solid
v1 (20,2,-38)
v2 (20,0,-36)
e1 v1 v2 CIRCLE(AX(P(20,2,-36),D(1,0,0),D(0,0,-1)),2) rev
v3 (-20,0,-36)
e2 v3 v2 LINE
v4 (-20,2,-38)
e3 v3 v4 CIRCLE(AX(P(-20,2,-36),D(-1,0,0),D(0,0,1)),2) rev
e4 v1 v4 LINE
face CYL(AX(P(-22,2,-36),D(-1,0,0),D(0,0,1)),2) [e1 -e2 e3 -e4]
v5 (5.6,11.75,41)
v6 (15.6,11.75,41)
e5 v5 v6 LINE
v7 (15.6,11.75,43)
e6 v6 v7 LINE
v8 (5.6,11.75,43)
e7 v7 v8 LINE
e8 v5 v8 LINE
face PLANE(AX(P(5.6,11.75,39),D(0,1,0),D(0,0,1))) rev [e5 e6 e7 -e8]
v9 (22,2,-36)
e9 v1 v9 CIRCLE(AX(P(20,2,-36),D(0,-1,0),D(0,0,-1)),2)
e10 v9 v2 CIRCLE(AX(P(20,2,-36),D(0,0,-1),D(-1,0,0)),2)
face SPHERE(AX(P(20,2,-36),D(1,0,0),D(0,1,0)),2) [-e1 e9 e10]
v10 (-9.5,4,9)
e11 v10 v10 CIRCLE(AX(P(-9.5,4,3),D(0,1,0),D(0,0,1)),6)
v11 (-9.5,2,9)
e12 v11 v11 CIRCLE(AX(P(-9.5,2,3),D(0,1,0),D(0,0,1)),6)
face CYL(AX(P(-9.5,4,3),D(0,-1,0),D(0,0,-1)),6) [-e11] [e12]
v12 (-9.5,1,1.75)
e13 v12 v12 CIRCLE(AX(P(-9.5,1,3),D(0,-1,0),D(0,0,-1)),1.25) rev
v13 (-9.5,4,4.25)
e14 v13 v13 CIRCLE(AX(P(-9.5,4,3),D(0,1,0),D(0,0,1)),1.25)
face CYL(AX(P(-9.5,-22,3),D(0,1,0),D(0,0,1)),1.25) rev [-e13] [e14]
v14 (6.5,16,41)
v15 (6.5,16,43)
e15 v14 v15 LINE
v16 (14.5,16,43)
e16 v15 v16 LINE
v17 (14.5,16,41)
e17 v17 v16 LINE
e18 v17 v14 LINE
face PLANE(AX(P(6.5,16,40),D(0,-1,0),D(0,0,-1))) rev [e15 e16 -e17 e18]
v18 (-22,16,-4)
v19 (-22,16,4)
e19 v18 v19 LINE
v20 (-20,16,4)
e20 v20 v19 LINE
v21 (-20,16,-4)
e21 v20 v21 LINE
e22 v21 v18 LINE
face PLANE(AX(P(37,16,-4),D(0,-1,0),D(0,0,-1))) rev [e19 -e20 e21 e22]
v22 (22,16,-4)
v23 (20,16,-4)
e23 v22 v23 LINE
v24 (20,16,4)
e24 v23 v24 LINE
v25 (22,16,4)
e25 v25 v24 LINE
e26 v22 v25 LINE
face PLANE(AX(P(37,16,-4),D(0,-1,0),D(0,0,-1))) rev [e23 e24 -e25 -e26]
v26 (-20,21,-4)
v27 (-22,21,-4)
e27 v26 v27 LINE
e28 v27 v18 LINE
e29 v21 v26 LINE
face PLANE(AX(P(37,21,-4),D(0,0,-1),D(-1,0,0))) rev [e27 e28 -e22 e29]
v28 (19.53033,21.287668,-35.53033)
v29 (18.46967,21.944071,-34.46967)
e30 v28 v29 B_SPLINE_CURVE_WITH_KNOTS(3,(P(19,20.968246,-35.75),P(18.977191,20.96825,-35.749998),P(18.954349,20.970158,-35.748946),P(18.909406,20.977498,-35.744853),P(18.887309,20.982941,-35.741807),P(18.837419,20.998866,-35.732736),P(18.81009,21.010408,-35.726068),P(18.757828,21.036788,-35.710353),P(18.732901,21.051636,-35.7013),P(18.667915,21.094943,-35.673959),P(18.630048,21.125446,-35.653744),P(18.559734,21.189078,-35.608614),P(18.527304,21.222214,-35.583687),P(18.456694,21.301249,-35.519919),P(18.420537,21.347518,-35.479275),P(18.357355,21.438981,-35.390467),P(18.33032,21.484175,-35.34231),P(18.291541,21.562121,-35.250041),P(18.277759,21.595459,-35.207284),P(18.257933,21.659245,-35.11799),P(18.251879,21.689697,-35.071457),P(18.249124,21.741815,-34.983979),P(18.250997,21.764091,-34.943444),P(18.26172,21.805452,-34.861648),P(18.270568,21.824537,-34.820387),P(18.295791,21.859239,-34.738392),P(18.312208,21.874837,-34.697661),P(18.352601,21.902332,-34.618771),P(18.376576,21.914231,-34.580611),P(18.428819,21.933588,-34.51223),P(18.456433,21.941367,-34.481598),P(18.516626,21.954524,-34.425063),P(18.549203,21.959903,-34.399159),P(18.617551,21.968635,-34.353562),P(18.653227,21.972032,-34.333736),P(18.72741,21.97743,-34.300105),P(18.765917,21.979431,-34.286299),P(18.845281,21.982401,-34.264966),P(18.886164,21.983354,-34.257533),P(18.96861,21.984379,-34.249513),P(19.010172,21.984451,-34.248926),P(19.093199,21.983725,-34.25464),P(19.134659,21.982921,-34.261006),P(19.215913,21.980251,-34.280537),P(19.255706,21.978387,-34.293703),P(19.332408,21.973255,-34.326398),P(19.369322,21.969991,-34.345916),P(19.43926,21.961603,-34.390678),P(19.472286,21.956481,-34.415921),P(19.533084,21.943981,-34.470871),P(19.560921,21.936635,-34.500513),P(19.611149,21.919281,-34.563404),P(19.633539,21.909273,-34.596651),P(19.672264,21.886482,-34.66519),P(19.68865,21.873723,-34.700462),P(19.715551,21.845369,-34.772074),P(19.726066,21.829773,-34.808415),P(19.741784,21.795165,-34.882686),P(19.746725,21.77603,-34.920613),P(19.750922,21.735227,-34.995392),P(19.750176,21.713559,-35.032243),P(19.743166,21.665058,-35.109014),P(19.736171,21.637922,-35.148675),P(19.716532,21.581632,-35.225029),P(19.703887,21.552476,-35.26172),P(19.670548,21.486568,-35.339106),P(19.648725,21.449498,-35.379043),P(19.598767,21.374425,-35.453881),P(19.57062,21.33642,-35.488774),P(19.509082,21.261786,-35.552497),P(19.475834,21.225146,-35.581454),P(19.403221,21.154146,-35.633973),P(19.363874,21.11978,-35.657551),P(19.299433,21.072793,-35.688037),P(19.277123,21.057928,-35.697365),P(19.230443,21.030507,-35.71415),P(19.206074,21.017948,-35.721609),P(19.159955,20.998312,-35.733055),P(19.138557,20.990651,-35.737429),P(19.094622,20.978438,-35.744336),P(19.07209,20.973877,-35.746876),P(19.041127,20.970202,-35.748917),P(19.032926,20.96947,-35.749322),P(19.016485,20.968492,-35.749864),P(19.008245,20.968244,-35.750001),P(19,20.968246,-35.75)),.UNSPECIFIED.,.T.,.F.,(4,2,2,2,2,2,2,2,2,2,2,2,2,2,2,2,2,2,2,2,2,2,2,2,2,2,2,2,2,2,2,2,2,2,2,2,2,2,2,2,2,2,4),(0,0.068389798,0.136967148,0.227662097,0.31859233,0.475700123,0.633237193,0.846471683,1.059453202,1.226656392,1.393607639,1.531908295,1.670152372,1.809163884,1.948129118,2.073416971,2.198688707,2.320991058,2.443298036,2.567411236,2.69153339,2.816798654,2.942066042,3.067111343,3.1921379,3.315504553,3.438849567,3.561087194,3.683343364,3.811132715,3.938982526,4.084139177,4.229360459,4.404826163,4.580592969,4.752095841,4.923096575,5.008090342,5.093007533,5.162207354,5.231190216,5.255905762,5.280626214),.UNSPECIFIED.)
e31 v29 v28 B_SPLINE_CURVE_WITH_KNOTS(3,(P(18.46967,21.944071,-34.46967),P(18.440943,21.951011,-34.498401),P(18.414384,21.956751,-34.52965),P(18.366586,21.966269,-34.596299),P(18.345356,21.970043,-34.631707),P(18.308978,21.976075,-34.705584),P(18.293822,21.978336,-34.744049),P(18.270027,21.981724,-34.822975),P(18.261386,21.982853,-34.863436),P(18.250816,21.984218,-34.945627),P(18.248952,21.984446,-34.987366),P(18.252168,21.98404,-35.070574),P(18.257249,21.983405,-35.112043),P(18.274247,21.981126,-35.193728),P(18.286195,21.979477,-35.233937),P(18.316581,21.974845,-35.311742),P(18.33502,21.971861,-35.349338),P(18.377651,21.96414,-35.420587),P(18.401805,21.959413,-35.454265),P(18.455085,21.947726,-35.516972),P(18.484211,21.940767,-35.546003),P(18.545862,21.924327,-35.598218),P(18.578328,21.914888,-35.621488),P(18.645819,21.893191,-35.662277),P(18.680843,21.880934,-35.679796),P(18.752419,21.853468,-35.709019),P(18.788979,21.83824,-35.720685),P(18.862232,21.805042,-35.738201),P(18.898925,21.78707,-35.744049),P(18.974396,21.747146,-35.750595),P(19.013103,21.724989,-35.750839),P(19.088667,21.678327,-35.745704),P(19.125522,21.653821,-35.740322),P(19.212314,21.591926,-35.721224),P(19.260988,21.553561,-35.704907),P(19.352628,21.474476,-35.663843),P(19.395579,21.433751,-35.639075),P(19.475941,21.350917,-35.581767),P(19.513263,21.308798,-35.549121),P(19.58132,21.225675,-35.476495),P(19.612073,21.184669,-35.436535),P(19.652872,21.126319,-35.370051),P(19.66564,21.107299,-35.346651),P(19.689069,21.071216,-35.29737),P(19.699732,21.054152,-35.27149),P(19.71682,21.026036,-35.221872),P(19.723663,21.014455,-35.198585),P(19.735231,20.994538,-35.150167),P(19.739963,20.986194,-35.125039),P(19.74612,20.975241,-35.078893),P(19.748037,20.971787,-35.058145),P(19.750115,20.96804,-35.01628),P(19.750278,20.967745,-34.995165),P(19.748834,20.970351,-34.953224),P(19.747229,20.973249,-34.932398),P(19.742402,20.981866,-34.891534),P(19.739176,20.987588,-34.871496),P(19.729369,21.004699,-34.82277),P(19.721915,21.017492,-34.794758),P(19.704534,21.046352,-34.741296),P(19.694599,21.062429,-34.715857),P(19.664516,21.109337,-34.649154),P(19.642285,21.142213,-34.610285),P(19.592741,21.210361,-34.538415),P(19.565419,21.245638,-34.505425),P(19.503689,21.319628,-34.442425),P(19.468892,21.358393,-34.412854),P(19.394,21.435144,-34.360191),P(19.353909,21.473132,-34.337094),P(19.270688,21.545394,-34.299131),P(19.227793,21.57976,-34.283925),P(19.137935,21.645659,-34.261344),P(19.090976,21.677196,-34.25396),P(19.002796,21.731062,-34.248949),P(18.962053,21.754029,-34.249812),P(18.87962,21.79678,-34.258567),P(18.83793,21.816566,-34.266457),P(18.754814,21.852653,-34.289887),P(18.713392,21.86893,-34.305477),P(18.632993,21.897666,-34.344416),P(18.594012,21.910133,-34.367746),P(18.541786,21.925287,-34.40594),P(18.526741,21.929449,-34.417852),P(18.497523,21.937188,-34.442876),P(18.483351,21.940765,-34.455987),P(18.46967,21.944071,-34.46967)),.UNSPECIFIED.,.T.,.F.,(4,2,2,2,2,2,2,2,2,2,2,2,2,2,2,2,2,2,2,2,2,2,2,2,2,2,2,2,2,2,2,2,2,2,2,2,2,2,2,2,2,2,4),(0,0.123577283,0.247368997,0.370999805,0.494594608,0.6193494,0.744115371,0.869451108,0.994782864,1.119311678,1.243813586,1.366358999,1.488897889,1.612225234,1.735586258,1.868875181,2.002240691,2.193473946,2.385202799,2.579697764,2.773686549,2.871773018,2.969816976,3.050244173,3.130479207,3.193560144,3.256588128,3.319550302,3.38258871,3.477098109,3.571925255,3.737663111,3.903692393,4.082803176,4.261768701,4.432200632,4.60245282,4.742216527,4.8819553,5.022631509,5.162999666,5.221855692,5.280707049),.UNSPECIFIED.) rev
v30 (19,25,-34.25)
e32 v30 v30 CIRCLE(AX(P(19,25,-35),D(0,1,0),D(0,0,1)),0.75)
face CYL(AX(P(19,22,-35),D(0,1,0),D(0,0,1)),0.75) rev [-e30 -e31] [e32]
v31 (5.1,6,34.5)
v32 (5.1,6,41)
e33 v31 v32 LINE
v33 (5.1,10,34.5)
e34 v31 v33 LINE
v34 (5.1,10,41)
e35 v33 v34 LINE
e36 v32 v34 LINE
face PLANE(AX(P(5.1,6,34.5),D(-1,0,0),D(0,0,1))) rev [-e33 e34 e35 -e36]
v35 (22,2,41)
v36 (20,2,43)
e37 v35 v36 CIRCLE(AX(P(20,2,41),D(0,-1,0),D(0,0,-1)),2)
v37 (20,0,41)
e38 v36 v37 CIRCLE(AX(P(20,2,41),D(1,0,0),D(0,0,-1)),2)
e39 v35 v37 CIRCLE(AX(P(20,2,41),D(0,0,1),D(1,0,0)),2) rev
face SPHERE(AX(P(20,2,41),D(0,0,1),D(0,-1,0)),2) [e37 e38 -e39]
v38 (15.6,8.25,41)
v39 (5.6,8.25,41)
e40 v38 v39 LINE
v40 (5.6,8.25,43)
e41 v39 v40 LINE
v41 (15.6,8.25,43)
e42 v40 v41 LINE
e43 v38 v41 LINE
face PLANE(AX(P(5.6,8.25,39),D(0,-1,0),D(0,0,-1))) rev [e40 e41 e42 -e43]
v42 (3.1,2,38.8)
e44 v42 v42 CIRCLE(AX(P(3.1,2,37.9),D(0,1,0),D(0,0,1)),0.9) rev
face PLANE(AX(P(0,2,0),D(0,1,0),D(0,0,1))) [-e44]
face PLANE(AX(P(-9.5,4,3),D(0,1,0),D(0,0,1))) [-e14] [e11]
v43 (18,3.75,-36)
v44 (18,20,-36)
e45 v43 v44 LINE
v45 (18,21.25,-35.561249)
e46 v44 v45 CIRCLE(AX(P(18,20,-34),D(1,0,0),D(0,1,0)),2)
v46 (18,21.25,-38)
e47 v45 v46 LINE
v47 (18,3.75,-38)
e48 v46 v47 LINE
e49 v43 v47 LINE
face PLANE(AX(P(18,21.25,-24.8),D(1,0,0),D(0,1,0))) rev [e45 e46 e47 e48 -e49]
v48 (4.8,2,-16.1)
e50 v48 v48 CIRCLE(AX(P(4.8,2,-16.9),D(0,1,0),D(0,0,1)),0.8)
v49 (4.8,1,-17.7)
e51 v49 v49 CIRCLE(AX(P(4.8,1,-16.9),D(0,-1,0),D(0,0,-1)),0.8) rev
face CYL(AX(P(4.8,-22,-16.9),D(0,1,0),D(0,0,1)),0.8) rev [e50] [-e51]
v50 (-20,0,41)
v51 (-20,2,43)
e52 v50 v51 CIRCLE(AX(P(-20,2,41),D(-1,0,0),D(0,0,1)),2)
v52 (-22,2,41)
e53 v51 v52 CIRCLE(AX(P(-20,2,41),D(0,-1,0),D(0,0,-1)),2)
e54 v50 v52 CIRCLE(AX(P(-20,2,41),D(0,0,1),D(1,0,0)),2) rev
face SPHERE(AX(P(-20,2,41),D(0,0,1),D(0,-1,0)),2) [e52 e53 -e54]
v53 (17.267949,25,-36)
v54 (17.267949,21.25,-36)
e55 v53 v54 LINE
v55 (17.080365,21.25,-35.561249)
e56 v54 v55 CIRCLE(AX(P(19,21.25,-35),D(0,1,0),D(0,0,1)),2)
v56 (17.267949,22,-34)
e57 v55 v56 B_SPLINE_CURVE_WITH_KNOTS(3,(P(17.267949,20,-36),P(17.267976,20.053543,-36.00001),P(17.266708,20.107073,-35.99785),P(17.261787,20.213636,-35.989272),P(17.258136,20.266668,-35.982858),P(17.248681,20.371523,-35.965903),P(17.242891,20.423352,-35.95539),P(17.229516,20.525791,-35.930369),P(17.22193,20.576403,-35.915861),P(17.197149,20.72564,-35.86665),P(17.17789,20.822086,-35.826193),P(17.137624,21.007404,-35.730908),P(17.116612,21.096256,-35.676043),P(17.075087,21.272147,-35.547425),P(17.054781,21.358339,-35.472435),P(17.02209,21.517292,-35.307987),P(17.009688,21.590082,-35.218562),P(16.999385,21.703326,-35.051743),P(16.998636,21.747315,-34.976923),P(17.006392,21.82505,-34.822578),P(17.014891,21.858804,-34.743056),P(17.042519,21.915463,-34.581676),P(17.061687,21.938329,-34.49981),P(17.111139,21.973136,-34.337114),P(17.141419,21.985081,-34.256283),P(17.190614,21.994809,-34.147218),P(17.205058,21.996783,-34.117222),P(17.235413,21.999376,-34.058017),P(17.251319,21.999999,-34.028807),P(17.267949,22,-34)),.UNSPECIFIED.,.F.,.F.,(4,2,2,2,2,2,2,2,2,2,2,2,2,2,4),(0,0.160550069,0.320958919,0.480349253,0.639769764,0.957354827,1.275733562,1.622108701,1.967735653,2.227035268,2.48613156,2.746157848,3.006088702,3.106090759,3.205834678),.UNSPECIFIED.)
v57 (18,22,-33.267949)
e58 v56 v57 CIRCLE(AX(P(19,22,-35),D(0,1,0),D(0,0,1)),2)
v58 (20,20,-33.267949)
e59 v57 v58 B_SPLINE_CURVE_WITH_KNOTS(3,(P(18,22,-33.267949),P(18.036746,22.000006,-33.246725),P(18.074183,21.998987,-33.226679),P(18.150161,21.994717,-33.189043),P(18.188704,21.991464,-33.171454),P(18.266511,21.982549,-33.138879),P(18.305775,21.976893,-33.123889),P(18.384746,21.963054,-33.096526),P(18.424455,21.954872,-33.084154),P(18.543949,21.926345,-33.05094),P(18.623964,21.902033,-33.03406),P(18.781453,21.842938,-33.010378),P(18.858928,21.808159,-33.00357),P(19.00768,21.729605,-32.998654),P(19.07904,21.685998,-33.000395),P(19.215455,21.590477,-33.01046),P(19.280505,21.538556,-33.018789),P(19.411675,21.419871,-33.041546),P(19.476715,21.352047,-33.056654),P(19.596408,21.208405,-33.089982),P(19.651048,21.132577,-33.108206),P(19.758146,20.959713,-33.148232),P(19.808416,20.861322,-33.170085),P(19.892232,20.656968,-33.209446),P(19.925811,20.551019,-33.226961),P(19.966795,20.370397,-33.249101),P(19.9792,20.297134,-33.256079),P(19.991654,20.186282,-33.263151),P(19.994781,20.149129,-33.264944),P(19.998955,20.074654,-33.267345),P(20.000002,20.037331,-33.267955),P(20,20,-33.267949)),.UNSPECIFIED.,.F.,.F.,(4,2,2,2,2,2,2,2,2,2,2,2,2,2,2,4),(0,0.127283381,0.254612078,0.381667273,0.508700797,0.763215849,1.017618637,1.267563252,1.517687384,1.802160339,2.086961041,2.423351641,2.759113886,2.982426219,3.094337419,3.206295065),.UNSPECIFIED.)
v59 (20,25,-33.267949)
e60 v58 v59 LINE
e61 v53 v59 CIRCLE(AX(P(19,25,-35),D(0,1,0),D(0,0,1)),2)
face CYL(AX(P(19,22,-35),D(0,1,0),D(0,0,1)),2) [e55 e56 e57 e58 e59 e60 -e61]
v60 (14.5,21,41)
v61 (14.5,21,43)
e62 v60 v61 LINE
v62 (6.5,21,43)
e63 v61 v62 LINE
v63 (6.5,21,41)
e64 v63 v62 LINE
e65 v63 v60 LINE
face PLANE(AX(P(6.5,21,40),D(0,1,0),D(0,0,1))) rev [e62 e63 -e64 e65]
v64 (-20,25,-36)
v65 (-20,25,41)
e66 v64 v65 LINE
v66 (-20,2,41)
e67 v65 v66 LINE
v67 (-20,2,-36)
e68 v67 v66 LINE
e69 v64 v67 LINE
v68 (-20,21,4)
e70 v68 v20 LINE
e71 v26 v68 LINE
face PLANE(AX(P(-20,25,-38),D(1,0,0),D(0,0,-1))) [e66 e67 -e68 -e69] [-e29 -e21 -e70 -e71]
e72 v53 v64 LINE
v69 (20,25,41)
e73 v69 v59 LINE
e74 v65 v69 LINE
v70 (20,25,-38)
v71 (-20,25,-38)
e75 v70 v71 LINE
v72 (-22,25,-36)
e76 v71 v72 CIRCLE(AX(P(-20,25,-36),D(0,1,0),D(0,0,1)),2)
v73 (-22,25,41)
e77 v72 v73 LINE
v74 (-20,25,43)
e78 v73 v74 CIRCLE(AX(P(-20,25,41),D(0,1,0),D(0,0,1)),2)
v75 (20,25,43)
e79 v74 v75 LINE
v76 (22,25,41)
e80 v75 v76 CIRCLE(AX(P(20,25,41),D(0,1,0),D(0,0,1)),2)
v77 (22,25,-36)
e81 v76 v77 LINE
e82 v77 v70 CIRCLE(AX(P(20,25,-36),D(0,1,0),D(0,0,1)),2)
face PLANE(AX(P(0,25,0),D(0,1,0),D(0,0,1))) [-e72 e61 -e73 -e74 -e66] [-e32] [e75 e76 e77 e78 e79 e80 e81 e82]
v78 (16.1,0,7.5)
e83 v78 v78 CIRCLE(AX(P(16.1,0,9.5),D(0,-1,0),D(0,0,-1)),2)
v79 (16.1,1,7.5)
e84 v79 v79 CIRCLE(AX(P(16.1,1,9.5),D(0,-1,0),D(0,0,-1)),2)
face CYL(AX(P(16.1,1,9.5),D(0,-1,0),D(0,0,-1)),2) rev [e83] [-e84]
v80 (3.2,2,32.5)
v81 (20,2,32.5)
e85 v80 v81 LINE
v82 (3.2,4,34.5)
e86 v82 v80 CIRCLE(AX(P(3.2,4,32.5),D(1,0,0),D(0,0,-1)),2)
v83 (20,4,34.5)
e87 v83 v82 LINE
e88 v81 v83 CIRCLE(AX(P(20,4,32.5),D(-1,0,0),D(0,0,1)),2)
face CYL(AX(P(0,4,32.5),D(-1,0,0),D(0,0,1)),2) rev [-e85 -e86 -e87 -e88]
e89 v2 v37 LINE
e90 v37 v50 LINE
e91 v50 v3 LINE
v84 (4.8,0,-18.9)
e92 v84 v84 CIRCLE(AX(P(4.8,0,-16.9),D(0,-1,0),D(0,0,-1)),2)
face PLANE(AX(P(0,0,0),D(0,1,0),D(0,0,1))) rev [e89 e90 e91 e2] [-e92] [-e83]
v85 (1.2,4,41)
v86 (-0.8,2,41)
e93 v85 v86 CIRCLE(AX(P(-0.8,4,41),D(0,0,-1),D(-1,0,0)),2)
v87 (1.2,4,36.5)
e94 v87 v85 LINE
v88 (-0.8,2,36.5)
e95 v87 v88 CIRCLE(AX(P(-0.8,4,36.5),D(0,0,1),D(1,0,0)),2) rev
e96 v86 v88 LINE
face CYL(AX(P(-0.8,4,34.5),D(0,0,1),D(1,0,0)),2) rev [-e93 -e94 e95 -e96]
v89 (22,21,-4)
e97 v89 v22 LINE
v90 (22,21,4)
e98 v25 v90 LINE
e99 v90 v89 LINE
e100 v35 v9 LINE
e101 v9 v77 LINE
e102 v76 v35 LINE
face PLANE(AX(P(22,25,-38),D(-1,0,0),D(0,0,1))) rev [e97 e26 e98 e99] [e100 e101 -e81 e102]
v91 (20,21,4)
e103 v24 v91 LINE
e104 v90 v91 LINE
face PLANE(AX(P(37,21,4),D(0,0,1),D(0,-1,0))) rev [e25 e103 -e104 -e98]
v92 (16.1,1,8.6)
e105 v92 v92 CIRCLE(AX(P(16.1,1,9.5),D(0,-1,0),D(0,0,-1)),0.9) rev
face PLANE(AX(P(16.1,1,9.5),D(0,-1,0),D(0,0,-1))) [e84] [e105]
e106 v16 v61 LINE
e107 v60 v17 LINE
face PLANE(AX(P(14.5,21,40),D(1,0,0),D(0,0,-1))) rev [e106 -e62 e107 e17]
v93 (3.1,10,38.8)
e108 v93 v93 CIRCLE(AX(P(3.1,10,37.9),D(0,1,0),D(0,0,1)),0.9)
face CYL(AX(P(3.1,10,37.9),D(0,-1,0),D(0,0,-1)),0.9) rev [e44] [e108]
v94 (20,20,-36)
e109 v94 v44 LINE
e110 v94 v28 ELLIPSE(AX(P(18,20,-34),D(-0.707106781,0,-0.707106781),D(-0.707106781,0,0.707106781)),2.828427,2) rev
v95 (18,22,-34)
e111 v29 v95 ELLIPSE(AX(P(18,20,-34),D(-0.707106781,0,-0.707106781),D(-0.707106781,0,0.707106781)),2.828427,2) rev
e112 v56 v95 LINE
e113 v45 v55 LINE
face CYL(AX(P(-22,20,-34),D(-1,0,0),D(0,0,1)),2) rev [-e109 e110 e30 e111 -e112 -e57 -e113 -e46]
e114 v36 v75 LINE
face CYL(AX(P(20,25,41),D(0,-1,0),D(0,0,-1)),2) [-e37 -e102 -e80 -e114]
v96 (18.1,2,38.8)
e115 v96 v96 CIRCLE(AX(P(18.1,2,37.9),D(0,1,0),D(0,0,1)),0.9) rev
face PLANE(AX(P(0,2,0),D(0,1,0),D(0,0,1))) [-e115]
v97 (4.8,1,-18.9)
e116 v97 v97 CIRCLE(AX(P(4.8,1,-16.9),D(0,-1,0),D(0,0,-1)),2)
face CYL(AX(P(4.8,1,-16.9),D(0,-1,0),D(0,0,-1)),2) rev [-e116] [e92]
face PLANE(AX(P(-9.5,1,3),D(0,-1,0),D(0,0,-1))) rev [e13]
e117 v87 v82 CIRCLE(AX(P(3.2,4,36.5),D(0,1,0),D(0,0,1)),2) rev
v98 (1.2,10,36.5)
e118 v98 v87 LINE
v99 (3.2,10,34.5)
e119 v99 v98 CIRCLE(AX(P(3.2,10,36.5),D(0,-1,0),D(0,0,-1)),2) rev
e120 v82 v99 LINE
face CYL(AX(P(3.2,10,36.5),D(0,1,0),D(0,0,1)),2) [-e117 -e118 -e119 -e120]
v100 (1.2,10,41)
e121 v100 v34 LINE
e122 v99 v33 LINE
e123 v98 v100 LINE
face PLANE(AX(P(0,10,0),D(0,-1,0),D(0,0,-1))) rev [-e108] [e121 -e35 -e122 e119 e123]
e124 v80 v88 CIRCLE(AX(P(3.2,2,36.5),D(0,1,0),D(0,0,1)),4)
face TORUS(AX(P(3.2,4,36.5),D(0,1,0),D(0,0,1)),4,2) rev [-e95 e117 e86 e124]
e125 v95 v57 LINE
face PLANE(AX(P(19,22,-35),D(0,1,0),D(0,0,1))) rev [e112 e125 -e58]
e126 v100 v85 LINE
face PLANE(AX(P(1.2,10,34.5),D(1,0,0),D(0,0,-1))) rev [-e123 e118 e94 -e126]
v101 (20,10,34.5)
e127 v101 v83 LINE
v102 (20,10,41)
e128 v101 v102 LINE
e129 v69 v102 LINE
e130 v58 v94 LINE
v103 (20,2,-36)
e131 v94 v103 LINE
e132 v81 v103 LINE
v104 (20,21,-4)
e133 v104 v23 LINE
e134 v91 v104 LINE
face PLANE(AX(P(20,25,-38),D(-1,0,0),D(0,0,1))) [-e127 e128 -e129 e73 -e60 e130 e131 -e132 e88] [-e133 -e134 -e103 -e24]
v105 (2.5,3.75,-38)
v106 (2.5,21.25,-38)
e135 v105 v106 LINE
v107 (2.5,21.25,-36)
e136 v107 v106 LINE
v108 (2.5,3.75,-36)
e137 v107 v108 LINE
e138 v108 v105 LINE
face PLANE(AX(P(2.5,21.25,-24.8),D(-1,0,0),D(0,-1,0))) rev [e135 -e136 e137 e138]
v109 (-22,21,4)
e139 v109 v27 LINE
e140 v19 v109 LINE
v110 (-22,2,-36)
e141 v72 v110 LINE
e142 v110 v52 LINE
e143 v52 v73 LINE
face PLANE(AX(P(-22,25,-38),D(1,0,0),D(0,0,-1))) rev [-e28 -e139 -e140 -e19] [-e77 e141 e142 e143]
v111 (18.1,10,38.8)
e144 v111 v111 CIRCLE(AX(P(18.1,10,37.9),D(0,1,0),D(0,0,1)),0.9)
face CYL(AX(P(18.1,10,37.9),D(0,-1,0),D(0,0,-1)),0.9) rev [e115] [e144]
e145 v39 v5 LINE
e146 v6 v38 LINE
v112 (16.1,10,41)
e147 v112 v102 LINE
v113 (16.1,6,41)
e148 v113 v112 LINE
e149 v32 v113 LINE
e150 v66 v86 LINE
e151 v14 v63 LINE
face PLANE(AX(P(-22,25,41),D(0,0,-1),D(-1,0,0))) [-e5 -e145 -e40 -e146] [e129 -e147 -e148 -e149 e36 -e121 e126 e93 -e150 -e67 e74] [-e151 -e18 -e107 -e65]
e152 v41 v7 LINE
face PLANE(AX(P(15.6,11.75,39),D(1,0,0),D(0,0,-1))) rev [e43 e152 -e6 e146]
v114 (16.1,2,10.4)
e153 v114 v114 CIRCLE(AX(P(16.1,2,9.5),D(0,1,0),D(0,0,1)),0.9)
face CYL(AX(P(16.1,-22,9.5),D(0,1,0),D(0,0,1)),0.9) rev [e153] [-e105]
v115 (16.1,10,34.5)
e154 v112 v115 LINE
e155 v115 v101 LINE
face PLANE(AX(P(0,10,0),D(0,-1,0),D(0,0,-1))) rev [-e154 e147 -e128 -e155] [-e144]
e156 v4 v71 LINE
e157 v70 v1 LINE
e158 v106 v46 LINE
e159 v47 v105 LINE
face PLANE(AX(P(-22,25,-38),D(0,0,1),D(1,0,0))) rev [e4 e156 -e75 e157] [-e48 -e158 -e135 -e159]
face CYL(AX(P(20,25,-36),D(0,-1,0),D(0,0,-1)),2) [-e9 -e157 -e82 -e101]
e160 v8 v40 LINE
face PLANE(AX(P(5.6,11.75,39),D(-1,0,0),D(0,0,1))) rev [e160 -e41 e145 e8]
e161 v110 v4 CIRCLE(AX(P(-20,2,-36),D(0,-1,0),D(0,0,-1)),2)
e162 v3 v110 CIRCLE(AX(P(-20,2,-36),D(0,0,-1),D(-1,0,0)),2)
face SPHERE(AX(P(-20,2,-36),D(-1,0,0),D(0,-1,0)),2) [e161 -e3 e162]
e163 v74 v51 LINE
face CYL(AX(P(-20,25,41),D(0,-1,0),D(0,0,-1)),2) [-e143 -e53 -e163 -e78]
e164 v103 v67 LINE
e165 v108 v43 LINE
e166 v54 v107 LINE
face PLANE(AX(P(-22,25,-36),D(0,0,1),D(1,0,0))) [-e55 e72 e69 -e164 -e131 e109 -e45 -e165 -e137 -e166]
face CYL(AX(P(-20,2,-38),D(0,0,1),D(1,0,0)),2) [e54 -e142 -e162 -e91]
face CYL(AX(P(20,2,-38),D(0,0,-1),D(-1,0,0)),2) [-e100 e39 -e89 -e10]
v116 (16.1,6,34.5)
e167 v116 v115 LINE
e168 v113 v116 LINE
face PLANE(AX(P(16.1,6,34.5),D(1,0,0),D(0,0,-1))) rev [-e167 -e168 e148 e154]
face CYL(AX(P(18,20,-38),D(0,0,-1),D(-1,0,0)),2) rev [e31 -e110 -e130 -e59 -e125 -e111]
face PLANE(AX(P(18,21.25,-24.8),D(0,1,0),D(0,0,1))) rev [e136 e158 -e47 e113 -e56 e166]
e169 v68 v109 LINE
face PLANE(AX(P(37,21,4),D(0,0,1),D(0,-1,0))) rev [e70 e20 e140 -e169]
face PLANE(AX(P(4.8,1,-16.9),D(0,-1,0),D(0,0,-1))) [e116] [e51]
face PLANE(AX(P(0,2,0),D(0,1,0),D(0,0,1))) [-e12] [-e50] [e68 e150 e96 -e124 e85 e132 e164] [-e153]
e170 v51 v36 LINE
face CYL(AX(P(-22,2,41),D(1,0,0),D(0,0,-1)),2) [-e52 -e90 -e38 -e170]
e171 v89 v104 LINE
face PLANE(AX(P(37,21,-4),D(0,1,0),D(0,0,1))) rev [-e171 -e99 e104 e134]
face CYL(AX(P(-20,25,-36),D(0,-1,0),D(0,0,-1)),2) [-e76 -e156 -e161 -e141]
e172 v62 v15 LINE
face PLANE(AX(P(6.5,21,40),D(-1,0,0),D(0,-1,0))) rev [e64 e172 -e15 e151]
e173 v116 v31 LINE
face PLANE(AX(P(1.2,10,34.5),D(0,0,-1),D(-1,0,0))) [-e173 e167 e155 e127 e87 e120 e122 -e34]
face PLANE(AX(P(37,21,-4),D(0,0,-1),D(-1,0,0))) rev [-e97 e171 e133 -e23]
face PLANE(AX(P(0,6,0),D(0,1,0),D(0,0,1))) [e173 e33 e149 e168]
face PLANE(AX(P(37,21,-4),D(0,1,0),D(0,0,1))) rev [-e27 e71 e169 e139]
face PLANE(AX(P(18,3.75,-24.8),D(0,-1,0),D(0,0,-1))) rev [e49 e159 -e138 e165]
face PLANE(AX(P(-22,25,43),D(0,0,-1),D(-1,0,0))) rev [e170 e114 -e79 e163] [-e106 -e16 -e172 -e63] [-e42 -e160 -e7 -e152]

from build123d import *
from build123d.topology import SkipClean

# Parameters (mm, degrees)
SKETCH_1_W           = 44
SKETCH_1_H           = 81
EXTRUDE_1_DEPTH      = 25
SHELL_1_T            = -2
FILLET_1_R           = 2
SKETCH_2_R           = 0.8
SKETCH_2_R_2         = 0.9
CUT_EXTRUDE_1_DEPTH  = 24
SKETCH_3_R           = 1.25
CUT_EXTRUDE_2_DEPTH  = 24
SKETCH_4_R           = 6
EXTRUDE_2_DEPTH      = 2
CUT_EXTRUDE_START    = -13.2
SKETCH_6_R           = 1.25
CUT_EXTRUDE_4_DEPTH  = 13.2
SKETCH_7_W           = 15.5
SKETCH_7_H           = 17.5
CUT_EXTRUDE_5_DEPTH  = 13.2
SKETCH_9_W           = 18.8
SKETCH_9_H           = 6.5
SKETCH_9_R           = 0.9
EXTRUDE_3_DEPTH      = 8
SKETCH_11_W          = 11
SKETCH_11_H          = 6.5
CUT_EXTRUDE_6_DEPTH  = 4
SKETCH_12_W          = 10
SKETCH_12_H          = 3.5
CUT_EXTRUDE_7_DEPTH  = 4
FILLET_2_R           = 2
EXTRUDE_START        = -1
SKETCH_14_R          = 1.25
EXTRUDE_4_DEPTH      = 1
SKETCH_15_R          = 2
CUT_EXTRUDE_8_DEPTH  = 1
SKETCH_16_W          = 8
SKETCH_16_H          = 5
CUT_EXTRUDE_9_DEPTH  = 59
SKETCH_17_R          = 2
EXTRUDE_5_DEPTH      = 3
SKETCH_18_R          = 0.75
CUT_EXTRUDE_10_DEPTH = 3
FILLET_3_R           = 2
SKETCH_19_W          = 8
SKETCH_19_H          = 5
CUT_EXTRUDE_11_DEPTH = 3


with BuildPart() as part:
    # 草图1 → 凸台-拉伸1 (new body)
    with BuildSketch(Plane(origin=(0, 0, 0), x_dir=(1, 0, 0), z_dir=(0, 1, 0))):
        with Locations((0, -2.5)):
            Rectangle(SKETCH_1_W, SKETCH_1_H)
    extrude(amount=EXTRUDE_1_DEPTH)

    # 抽壳1
    shell_1_openings = [part.faces().sort_by_distance(p)[0] for p in [
        (0, 25, 2.5),
    ]]
    offset(amount=SHELL_1_T, openings=shell_1_openings, kind=Kind.INTERSECTION)

    # 圆角1
    fillet_1_edges = [part.edges().sort_by_distance(p)[0] for p in [
        (0, 0, -38),
        (22, 0, 2.5),
        (0, 0, 43),
        (-22, 0, 2.5),
        (-22, 12.5, -38),
        (22, 12.5, -38),
        (22, 12.5, 43),
        (-22, 12.5, 43),
    ]]
    fillet(fillet_1_edges, radius=FILLET_1_R)

    # 草图2 → 切除-拉伸1 (cut)
    with BuildSketch(Plane(origin=(0, 2, 0), x_dir=(1, 0, 0), z_dir=(0, 1, 0))):
        with Locations(Location((4.8, 16.9, 0), (0, 0, 270))):
            Circle(SKETCH_2_R)
        with Locations(Location((16.1, -9.5, 0), (0, 0, 270))):
            Circle(SKETCH_2_R_2)
    extrude(amount=-CUT_EXTRUDE_1_DEPTH, mode=Mode.SUBTRACT)

    # 草图3 → 切除-拉伸2 (cut)
    with BuildSketch(Plane(origin=(0, 2, 0), x_dir=(1, 0, 0), z_dir=(0, 1, 0))):
        with Locations(Location((-9.5, -3, 0), (0, 0, 270))):
            Circle(SKETCH_3_R)
    extrude(amount=-CUT_EXTRUDE_2_DEPTH, mode=Mode.SUBTRACT)

    # 草图4 → 凸台-拉伸2 (add)
    with BuildSketch(Plane(origin=(0, 2, 0), x_dir=(1, 0, 0), z_dir=(0, 1, 0))):
        with Locations(Location((-9.5, -3, 0), (0, 0, 270))):
            Circle(SKETCH_4_R)
    extrude(amount=EXTRUDE_2_DEPTH)

    # 草图6 → 切除-拉伸4 (cut)
    with BuildSketch(Plane.XZ.offset(CUT_EXTRUDE_START)):
        with Locations(Location((-9.5, 3, 0), (0, 0, 90))):
            Circle(SKETCH_6_R)
    extrude(amount=CUT_EXTRUDE_4_DEPTH, mode=Mode.SUBTRACT)

    # 草图7 → 切除-拉伸5 (cut)
    with BuildSketch(Plane(origin=(0, 0, -38), x_dir=(-1, 0, 0), z_dir=(0, 0, -1))):
        with Locations((-10.25, 12.5)):
            Rectangle(SKETCH_7_W, SKETCH_7_H)
    extrude(amount=-CUT_EXTRUDE_5_DEPTH, mode=Mode.SUBTRACT)

    # 草图9 → 凸台-拉伸3 (add)
    with BuildSketch(Plane(origin=(0, 2, 0), x_dir=(1, 0, 0), z_dir=(0, 1, 0))):
        with Locations((10.6, -37.75)):
            Rectangle(SKETCH_9_W, SKETCH_9_H)
        with Locations(Location((18.1, -37.9, 0), (0, 0, 270))):
            Circle(SKETCH_9_R, mode=Mode.SUBTRACT)
        with Locations(Location((3.1, -37.9, 0), (0, 0, 270))):
            Circle(SKETCH_9_R, mode=Mode.SUBTRACT)
    extrude(amount=EXTRUDE_3_DEPTH)

    # 草图11 → 切除-拉伸6 (cut)
    with BuildSketch(Plane(origin=(0, 10, 0), x_dir=(1, 0, 0), z_dir=(0, 1, 0))):
        with Locations((10.6, -37.75)):
            Rectangle(SKETCH_11_W, SKETCH_11_H)
    extrude(amount=-CUT_EXTRUDE_6_DEPTH, mode=Mode.SUBTRACT)

    # 草图12 → 切除-拉伸7 (cut)
    with BuildSketch(Plane.XY.offset(43)):
        with Locations((10.6, 10)):
            Rectangle(SKETCH_12_W, SKETCH_12_H)
    extrude(amount=-CUT_EXTRUDE_7_DEPTH, mode=Mode.SUBTRACT)

    # 圆角2
    fillet_2_edges = [part.edges().sort_by_distance(p)[0] for p in [
        (10.6, 2, 34.5),
        (1.2, 2, 37.75),
        (1.2, 6, 34.5),
    ]]
    fillet(fillet_2_edges, radius=FILLET_2_R)

    # 草图14 → 凸台-拉伸4 (add)
    with BuildSketch(Plane.XZ.offset(EXTRUDE_START)):
        with Locations(Location((-9.5, 3, 0), (0, 0, 90))):
            Circle(SKETCH_14_R)
    extrude(amount=EXTRUDE_4_DEPTH)

    # 草图15 → 切除-拉伸8 (cut)
    with BuildSketch(Plane.XZ):
        with Locations(Location((16.1, 9.5, 0), (0, 0, 270))):
            Circle(SKETCH_15_R)
        with Locations(Location((4.8, -16.9, 0), (0, 0, 270))):
            Circle(SKETCH_15_R)
    extrude(amount=-CUT_EXTRUDE_8_DEPTH, mode=Mode.SUBTRACT)

    # 草图16 → 切除-拉伸9 (cut)
    with BuildSketch(Plane.ZY.offset(22)):
        with Locations((0, 18.5)):
            Rectangle(SKETCH_16_W, SKETCH_16_H)
    extrude(amount=-CUT_EXTRUDE_9_DEPTH, mode=Mode.SUBTRACT)

    # 草图17 → 凸台-拉伸5 (add)
    with BuildSketch(Plane(origin=(0, 25, 0), x_dir=(1, 0, 0), z_dir=(0, 1, 0))):
        with Locations((19, 35)):
            Circle(SKETCH_17_R)
    extrude(amount=-EXTRUDE_5_DEPTH)

    # 草图18 → 切除-拉伸10 (cut)
    with BuildSketch(Plane(origin=(0, 25, 0), x_dir=(1, 0, 0), z_dir=(0, 1, 0))):
        with Locations(Location((19, 35, 0), (0, 0, 270))):
            Circle(SKETCH_18_R)
    extrude(amount=-CUT_EXTRUDE_10_DEPTH, mode=Mode.SUBTRACT)

    # 圆角3
    # the kernel refuses this fillet: 2 mm, written as the material it adds along each edge
    with BuildSketch(Plane(origin=(12.267949192, 22, -36), x_dir=(0, -1, 0), z_dir=(1, 0, 0))) as fillet_3_piece_1_section:
        with BuildLine():
            CenterArc((FILLET_3_R, -FILLET_3_R), FILLET_3_R, 90, 90)
            Line((0, -FILLET_3_R), (0, 0))
            Line((0, 0), (FILLET_3_R, 0))
        make_face()
    fillet_3_piece_1 = extrude(amount=7.732050808, mode=Mode.PRIVATE)
    fillet_3_piece_1 = fillet_3_piece_1 & Plane(origin=(19, 21.743486993, -35), x_dir=(1, 0, 0), z_dir=(0, 1, 0)) * Cylinder(2, 24, mode=Mode.PRIVATE)
    fillet_3_piece_1 = split(fillet_3_piece_1, bisect_by=Plane(origin=(18, 21.743486993, -35.418577815), z_dir=(-1, 0, 0)), keep=Keep.TOP, mode=Mode.PRIVATE)
    fillet_3_piece_1 = split(fillet_3_piece_1, bisect_by=Plane(origin=(17.546708028, 21.25, -35.418577815), z_dir=(0, 1, 0)), keep=Keep.TOP, mode=Mode.PRIVATE)
    add(fillet_3_piece_1)
    with BuildSketch(Plane(origin=(12.267949192, 22, -36), x_dir=(0, -1, 0), z_dir=(1, 0, 0))) as fillet_3_piece_2_section:
        with BuildLine():
            CenterArc((FILLET_3_R, -FILLET_3_R), FILLET_3_R, 90, 90)
            Line((0, -FILLET_3_R), (0, 0))
            Line((0, 0), (FILLET_3_R, 0))
        make_face()
    fillet_3_piece_2 = extrude(amount=7.732050808, mode=Mode.PRIVATE)
    fillet_3_piece_2 = split(fillet_3_piece_2, bisect_by=Plane(origin=(18, 20.864048259, -35.911747477), z_dir=(1, 0, 0)), keep=Keep.TOP, mode=Mode.PRIVATE)
    fillet_3_piece_2 = split(fillet_3_piece_2, bisect_by=Plane(origin=(18.99999999, 21.25, -35.911747477), z_dir=(0, -1, 0)), keep=Keep.TOP, mode=Mode.PRIVATE)
    fillet_3_piece_2 = fillet_3_piece_2 - Plane(origin=(19, 20.864048259, -35), x_dir=(0, 0, 1), z_dir=(0, 1, 0)) * Cylinder(0.75, 24, mode=Mode.PRIVATE)
    add(fillet_3_piece_2)
    with BuildSketch(Plane(origin=(12.267949192, 22, -36), x_dir=(0, -1, 0), z_dir=(1, 0, 0))) as fillet_3_piece_3_section:
        with BuildLine():
            CenterArc((FILLET_3_R, -FILLET_3_R), FILLET_3_R, 90, 90)
            Line((0, -FILLET_3_R), (0, 0))
            Line((0, 0), (FILLET_3_R, 0))
        make_face()
    fillet_3_piece_3 = extrude(amount=7.732050808, mode=Mode.PRIVATE)
    fillet_3_piece_3 = split(fillet_3_piece_3, bisect_by=Plane(origin=(18, 21.475531477, -35.364676357), z_dir=(1, 0, 0)), keep=Keep.TOP, mode=Mode.PRIVATE)
    fillet_3_piece_3 = split(fillet_3_piece_3, bisect_by=Plane(origin=(19.666666667, 21.25, -35.364676357), z_dir=(0, 1, 0)), keep=Keep.TOP, mode=Mode.PRIVATE)
    fillet_3_piece_3 = fillet_3_piece_3 - Plane(origin=(19, 21.475531477, -35), x_dir=(0, 0, 1), z_dir=(0, 1, 0)) * Cylinder(0.75, 24, mode=Mode.PRIVATE)
    add(fillet_3_piece_3)
    with BuildSketch(Plane(origin=(12.267949192, 22, -36), x_dir=(0, -1, 0), z_dir=(1, 0, 0))) as fillet_3_piece_4_section:
        with BuildLine():
            CenterArc((FILLET_3_R, -FILLET_3_R), FILLET_3_R, 90, 90)
            Line((0, -FILLET_3_R), (0, 0))
            Line((0, 0), (FILLET_3_R, 0))
        make_face()
    fillet_3_piece_4 = extrude(amount=12.732050808, mode=Mode.PRIVATE)
    fillet_3_piece_4 = split(fillet_3_piece_4, bisect_by=Plane(origin=(20, 20.885178509, -35.897350533), z_dir=(1, 0, 0)), keep=Keep.TOP, mode=Mode.PRIVATE)
    fillet_3_piece_4 = fillet_3_piece_4 & Plane(origin=(19, 20.885178509, -35), x_dir=(1, 0, 0), z_dir=(0, 1, 0)) * Cylinder(2, 34, mode=Mode.PRIVATE)
    fillet_3_piece_4 = split(fillet_3_piece_4, bisect_by=Plane(origin=(20.391607497, 21.25, -35.897350533), z_dir=(0, -1, 0)), keep=Keep.TOP, mode=Mode.PRIVATE)
    add(fillet_3_piece_4)
    with BuildSketch(Plane(origin=(12.267949192, 22, -36), x_dir=(0, -1, 0), z_dir=(1, 0, 0))) as fillet_3_piece_5_section:
        with BuildLine():
            CenterArc((FILLET_3_R, -FILLET_3_R), FILLET_3_R, 90, 90)
            Line((0, -FILLET_3_R), (0, 0))
            Line((0, 0), (FILLET_3_R, 0))
        make_face()
    fillet_3_piece_5 = extrude(amount=12.732050808, mode=Mode.PRIVATE)
    fillet_3_piece_5 = split(fillet_3_piece_5, bisect_by=Plane(origin=(20, 21.743487033, -35.418577693), z_dir=(1, 0, 0)), keep=Keep.TOP, mode=Mode.PRIVATE)
    fillet_3_piece_5 = fillet_3_piece_5 & Plane(origin=(19, 21.743487033, -35), x_dir=(1, 0, 0), z_dir=(0, 1, 0)) * Cylinder(2, 34, mode=Mode.PRIVATE)
    fillet_3_piece_5 = split(fillet_3_piece_5, bisect_by=Plane(origin=(20.45329205, 21.25, -35.418577693), z_dir=(0, 1, 0)), keep=Keep.TOP, mode=Mode.PRIVATE)
    add(fillet_3_piece_5)
    with BuildSketch(Plane(origin=(20, 22, -41), x_dir=(0, -1, 0), z_dir=(0, 0, 1))) as fillet_3_piece_6_section:
        with BuildLine():
            CenterArc((FILLET_3_R, -FILLET_3_R), FILLET_3_R, 90, 90)
            Line((0, -FILLET_3_R), (0, 0))
            Line((0, 0), (FILLET_3_R, 0))
        make_face()
    fillet_3_piece_6 = extrude(amount=12.732050808, mode=Mode.PRIVATE)
    fillet_3_piece_6 = fillet_3_piece_6 & Plane(origin=(19, 21.575046731, -35), x_dir=(1, 0, 0), z_dir=(0, 1, 0)) * Cylinder(2, 34, mode=Mode.PRIVATE)
    fillet_3_piece_6 = fillet_3_piece_6 - Plane(origin=(19, 21.575046731, -35), x_dir=(0, 0, 1), z_dir=(0, 1, 0)) * Cylinder(0.75, 34, mode=Mode.PRIVATE)
    add(fillet_3_piece_6)

    # 草图19 → 切除-拉伸11 (cut)
    with SkipClean():  # the faces are left unmerged after this step: merging them gives an invalid solid
        with BuildSketch(Plane.XY.offset(43)):
            with Locations((10.5, 18.5)):
                Rectangle(SKETCH_19_W, SKETCH_19_H)
        extrude(amount=-CUT_EXTRUDE_11_DEPTH, mode=Mode.SUBTRACT)


solid = part.part
